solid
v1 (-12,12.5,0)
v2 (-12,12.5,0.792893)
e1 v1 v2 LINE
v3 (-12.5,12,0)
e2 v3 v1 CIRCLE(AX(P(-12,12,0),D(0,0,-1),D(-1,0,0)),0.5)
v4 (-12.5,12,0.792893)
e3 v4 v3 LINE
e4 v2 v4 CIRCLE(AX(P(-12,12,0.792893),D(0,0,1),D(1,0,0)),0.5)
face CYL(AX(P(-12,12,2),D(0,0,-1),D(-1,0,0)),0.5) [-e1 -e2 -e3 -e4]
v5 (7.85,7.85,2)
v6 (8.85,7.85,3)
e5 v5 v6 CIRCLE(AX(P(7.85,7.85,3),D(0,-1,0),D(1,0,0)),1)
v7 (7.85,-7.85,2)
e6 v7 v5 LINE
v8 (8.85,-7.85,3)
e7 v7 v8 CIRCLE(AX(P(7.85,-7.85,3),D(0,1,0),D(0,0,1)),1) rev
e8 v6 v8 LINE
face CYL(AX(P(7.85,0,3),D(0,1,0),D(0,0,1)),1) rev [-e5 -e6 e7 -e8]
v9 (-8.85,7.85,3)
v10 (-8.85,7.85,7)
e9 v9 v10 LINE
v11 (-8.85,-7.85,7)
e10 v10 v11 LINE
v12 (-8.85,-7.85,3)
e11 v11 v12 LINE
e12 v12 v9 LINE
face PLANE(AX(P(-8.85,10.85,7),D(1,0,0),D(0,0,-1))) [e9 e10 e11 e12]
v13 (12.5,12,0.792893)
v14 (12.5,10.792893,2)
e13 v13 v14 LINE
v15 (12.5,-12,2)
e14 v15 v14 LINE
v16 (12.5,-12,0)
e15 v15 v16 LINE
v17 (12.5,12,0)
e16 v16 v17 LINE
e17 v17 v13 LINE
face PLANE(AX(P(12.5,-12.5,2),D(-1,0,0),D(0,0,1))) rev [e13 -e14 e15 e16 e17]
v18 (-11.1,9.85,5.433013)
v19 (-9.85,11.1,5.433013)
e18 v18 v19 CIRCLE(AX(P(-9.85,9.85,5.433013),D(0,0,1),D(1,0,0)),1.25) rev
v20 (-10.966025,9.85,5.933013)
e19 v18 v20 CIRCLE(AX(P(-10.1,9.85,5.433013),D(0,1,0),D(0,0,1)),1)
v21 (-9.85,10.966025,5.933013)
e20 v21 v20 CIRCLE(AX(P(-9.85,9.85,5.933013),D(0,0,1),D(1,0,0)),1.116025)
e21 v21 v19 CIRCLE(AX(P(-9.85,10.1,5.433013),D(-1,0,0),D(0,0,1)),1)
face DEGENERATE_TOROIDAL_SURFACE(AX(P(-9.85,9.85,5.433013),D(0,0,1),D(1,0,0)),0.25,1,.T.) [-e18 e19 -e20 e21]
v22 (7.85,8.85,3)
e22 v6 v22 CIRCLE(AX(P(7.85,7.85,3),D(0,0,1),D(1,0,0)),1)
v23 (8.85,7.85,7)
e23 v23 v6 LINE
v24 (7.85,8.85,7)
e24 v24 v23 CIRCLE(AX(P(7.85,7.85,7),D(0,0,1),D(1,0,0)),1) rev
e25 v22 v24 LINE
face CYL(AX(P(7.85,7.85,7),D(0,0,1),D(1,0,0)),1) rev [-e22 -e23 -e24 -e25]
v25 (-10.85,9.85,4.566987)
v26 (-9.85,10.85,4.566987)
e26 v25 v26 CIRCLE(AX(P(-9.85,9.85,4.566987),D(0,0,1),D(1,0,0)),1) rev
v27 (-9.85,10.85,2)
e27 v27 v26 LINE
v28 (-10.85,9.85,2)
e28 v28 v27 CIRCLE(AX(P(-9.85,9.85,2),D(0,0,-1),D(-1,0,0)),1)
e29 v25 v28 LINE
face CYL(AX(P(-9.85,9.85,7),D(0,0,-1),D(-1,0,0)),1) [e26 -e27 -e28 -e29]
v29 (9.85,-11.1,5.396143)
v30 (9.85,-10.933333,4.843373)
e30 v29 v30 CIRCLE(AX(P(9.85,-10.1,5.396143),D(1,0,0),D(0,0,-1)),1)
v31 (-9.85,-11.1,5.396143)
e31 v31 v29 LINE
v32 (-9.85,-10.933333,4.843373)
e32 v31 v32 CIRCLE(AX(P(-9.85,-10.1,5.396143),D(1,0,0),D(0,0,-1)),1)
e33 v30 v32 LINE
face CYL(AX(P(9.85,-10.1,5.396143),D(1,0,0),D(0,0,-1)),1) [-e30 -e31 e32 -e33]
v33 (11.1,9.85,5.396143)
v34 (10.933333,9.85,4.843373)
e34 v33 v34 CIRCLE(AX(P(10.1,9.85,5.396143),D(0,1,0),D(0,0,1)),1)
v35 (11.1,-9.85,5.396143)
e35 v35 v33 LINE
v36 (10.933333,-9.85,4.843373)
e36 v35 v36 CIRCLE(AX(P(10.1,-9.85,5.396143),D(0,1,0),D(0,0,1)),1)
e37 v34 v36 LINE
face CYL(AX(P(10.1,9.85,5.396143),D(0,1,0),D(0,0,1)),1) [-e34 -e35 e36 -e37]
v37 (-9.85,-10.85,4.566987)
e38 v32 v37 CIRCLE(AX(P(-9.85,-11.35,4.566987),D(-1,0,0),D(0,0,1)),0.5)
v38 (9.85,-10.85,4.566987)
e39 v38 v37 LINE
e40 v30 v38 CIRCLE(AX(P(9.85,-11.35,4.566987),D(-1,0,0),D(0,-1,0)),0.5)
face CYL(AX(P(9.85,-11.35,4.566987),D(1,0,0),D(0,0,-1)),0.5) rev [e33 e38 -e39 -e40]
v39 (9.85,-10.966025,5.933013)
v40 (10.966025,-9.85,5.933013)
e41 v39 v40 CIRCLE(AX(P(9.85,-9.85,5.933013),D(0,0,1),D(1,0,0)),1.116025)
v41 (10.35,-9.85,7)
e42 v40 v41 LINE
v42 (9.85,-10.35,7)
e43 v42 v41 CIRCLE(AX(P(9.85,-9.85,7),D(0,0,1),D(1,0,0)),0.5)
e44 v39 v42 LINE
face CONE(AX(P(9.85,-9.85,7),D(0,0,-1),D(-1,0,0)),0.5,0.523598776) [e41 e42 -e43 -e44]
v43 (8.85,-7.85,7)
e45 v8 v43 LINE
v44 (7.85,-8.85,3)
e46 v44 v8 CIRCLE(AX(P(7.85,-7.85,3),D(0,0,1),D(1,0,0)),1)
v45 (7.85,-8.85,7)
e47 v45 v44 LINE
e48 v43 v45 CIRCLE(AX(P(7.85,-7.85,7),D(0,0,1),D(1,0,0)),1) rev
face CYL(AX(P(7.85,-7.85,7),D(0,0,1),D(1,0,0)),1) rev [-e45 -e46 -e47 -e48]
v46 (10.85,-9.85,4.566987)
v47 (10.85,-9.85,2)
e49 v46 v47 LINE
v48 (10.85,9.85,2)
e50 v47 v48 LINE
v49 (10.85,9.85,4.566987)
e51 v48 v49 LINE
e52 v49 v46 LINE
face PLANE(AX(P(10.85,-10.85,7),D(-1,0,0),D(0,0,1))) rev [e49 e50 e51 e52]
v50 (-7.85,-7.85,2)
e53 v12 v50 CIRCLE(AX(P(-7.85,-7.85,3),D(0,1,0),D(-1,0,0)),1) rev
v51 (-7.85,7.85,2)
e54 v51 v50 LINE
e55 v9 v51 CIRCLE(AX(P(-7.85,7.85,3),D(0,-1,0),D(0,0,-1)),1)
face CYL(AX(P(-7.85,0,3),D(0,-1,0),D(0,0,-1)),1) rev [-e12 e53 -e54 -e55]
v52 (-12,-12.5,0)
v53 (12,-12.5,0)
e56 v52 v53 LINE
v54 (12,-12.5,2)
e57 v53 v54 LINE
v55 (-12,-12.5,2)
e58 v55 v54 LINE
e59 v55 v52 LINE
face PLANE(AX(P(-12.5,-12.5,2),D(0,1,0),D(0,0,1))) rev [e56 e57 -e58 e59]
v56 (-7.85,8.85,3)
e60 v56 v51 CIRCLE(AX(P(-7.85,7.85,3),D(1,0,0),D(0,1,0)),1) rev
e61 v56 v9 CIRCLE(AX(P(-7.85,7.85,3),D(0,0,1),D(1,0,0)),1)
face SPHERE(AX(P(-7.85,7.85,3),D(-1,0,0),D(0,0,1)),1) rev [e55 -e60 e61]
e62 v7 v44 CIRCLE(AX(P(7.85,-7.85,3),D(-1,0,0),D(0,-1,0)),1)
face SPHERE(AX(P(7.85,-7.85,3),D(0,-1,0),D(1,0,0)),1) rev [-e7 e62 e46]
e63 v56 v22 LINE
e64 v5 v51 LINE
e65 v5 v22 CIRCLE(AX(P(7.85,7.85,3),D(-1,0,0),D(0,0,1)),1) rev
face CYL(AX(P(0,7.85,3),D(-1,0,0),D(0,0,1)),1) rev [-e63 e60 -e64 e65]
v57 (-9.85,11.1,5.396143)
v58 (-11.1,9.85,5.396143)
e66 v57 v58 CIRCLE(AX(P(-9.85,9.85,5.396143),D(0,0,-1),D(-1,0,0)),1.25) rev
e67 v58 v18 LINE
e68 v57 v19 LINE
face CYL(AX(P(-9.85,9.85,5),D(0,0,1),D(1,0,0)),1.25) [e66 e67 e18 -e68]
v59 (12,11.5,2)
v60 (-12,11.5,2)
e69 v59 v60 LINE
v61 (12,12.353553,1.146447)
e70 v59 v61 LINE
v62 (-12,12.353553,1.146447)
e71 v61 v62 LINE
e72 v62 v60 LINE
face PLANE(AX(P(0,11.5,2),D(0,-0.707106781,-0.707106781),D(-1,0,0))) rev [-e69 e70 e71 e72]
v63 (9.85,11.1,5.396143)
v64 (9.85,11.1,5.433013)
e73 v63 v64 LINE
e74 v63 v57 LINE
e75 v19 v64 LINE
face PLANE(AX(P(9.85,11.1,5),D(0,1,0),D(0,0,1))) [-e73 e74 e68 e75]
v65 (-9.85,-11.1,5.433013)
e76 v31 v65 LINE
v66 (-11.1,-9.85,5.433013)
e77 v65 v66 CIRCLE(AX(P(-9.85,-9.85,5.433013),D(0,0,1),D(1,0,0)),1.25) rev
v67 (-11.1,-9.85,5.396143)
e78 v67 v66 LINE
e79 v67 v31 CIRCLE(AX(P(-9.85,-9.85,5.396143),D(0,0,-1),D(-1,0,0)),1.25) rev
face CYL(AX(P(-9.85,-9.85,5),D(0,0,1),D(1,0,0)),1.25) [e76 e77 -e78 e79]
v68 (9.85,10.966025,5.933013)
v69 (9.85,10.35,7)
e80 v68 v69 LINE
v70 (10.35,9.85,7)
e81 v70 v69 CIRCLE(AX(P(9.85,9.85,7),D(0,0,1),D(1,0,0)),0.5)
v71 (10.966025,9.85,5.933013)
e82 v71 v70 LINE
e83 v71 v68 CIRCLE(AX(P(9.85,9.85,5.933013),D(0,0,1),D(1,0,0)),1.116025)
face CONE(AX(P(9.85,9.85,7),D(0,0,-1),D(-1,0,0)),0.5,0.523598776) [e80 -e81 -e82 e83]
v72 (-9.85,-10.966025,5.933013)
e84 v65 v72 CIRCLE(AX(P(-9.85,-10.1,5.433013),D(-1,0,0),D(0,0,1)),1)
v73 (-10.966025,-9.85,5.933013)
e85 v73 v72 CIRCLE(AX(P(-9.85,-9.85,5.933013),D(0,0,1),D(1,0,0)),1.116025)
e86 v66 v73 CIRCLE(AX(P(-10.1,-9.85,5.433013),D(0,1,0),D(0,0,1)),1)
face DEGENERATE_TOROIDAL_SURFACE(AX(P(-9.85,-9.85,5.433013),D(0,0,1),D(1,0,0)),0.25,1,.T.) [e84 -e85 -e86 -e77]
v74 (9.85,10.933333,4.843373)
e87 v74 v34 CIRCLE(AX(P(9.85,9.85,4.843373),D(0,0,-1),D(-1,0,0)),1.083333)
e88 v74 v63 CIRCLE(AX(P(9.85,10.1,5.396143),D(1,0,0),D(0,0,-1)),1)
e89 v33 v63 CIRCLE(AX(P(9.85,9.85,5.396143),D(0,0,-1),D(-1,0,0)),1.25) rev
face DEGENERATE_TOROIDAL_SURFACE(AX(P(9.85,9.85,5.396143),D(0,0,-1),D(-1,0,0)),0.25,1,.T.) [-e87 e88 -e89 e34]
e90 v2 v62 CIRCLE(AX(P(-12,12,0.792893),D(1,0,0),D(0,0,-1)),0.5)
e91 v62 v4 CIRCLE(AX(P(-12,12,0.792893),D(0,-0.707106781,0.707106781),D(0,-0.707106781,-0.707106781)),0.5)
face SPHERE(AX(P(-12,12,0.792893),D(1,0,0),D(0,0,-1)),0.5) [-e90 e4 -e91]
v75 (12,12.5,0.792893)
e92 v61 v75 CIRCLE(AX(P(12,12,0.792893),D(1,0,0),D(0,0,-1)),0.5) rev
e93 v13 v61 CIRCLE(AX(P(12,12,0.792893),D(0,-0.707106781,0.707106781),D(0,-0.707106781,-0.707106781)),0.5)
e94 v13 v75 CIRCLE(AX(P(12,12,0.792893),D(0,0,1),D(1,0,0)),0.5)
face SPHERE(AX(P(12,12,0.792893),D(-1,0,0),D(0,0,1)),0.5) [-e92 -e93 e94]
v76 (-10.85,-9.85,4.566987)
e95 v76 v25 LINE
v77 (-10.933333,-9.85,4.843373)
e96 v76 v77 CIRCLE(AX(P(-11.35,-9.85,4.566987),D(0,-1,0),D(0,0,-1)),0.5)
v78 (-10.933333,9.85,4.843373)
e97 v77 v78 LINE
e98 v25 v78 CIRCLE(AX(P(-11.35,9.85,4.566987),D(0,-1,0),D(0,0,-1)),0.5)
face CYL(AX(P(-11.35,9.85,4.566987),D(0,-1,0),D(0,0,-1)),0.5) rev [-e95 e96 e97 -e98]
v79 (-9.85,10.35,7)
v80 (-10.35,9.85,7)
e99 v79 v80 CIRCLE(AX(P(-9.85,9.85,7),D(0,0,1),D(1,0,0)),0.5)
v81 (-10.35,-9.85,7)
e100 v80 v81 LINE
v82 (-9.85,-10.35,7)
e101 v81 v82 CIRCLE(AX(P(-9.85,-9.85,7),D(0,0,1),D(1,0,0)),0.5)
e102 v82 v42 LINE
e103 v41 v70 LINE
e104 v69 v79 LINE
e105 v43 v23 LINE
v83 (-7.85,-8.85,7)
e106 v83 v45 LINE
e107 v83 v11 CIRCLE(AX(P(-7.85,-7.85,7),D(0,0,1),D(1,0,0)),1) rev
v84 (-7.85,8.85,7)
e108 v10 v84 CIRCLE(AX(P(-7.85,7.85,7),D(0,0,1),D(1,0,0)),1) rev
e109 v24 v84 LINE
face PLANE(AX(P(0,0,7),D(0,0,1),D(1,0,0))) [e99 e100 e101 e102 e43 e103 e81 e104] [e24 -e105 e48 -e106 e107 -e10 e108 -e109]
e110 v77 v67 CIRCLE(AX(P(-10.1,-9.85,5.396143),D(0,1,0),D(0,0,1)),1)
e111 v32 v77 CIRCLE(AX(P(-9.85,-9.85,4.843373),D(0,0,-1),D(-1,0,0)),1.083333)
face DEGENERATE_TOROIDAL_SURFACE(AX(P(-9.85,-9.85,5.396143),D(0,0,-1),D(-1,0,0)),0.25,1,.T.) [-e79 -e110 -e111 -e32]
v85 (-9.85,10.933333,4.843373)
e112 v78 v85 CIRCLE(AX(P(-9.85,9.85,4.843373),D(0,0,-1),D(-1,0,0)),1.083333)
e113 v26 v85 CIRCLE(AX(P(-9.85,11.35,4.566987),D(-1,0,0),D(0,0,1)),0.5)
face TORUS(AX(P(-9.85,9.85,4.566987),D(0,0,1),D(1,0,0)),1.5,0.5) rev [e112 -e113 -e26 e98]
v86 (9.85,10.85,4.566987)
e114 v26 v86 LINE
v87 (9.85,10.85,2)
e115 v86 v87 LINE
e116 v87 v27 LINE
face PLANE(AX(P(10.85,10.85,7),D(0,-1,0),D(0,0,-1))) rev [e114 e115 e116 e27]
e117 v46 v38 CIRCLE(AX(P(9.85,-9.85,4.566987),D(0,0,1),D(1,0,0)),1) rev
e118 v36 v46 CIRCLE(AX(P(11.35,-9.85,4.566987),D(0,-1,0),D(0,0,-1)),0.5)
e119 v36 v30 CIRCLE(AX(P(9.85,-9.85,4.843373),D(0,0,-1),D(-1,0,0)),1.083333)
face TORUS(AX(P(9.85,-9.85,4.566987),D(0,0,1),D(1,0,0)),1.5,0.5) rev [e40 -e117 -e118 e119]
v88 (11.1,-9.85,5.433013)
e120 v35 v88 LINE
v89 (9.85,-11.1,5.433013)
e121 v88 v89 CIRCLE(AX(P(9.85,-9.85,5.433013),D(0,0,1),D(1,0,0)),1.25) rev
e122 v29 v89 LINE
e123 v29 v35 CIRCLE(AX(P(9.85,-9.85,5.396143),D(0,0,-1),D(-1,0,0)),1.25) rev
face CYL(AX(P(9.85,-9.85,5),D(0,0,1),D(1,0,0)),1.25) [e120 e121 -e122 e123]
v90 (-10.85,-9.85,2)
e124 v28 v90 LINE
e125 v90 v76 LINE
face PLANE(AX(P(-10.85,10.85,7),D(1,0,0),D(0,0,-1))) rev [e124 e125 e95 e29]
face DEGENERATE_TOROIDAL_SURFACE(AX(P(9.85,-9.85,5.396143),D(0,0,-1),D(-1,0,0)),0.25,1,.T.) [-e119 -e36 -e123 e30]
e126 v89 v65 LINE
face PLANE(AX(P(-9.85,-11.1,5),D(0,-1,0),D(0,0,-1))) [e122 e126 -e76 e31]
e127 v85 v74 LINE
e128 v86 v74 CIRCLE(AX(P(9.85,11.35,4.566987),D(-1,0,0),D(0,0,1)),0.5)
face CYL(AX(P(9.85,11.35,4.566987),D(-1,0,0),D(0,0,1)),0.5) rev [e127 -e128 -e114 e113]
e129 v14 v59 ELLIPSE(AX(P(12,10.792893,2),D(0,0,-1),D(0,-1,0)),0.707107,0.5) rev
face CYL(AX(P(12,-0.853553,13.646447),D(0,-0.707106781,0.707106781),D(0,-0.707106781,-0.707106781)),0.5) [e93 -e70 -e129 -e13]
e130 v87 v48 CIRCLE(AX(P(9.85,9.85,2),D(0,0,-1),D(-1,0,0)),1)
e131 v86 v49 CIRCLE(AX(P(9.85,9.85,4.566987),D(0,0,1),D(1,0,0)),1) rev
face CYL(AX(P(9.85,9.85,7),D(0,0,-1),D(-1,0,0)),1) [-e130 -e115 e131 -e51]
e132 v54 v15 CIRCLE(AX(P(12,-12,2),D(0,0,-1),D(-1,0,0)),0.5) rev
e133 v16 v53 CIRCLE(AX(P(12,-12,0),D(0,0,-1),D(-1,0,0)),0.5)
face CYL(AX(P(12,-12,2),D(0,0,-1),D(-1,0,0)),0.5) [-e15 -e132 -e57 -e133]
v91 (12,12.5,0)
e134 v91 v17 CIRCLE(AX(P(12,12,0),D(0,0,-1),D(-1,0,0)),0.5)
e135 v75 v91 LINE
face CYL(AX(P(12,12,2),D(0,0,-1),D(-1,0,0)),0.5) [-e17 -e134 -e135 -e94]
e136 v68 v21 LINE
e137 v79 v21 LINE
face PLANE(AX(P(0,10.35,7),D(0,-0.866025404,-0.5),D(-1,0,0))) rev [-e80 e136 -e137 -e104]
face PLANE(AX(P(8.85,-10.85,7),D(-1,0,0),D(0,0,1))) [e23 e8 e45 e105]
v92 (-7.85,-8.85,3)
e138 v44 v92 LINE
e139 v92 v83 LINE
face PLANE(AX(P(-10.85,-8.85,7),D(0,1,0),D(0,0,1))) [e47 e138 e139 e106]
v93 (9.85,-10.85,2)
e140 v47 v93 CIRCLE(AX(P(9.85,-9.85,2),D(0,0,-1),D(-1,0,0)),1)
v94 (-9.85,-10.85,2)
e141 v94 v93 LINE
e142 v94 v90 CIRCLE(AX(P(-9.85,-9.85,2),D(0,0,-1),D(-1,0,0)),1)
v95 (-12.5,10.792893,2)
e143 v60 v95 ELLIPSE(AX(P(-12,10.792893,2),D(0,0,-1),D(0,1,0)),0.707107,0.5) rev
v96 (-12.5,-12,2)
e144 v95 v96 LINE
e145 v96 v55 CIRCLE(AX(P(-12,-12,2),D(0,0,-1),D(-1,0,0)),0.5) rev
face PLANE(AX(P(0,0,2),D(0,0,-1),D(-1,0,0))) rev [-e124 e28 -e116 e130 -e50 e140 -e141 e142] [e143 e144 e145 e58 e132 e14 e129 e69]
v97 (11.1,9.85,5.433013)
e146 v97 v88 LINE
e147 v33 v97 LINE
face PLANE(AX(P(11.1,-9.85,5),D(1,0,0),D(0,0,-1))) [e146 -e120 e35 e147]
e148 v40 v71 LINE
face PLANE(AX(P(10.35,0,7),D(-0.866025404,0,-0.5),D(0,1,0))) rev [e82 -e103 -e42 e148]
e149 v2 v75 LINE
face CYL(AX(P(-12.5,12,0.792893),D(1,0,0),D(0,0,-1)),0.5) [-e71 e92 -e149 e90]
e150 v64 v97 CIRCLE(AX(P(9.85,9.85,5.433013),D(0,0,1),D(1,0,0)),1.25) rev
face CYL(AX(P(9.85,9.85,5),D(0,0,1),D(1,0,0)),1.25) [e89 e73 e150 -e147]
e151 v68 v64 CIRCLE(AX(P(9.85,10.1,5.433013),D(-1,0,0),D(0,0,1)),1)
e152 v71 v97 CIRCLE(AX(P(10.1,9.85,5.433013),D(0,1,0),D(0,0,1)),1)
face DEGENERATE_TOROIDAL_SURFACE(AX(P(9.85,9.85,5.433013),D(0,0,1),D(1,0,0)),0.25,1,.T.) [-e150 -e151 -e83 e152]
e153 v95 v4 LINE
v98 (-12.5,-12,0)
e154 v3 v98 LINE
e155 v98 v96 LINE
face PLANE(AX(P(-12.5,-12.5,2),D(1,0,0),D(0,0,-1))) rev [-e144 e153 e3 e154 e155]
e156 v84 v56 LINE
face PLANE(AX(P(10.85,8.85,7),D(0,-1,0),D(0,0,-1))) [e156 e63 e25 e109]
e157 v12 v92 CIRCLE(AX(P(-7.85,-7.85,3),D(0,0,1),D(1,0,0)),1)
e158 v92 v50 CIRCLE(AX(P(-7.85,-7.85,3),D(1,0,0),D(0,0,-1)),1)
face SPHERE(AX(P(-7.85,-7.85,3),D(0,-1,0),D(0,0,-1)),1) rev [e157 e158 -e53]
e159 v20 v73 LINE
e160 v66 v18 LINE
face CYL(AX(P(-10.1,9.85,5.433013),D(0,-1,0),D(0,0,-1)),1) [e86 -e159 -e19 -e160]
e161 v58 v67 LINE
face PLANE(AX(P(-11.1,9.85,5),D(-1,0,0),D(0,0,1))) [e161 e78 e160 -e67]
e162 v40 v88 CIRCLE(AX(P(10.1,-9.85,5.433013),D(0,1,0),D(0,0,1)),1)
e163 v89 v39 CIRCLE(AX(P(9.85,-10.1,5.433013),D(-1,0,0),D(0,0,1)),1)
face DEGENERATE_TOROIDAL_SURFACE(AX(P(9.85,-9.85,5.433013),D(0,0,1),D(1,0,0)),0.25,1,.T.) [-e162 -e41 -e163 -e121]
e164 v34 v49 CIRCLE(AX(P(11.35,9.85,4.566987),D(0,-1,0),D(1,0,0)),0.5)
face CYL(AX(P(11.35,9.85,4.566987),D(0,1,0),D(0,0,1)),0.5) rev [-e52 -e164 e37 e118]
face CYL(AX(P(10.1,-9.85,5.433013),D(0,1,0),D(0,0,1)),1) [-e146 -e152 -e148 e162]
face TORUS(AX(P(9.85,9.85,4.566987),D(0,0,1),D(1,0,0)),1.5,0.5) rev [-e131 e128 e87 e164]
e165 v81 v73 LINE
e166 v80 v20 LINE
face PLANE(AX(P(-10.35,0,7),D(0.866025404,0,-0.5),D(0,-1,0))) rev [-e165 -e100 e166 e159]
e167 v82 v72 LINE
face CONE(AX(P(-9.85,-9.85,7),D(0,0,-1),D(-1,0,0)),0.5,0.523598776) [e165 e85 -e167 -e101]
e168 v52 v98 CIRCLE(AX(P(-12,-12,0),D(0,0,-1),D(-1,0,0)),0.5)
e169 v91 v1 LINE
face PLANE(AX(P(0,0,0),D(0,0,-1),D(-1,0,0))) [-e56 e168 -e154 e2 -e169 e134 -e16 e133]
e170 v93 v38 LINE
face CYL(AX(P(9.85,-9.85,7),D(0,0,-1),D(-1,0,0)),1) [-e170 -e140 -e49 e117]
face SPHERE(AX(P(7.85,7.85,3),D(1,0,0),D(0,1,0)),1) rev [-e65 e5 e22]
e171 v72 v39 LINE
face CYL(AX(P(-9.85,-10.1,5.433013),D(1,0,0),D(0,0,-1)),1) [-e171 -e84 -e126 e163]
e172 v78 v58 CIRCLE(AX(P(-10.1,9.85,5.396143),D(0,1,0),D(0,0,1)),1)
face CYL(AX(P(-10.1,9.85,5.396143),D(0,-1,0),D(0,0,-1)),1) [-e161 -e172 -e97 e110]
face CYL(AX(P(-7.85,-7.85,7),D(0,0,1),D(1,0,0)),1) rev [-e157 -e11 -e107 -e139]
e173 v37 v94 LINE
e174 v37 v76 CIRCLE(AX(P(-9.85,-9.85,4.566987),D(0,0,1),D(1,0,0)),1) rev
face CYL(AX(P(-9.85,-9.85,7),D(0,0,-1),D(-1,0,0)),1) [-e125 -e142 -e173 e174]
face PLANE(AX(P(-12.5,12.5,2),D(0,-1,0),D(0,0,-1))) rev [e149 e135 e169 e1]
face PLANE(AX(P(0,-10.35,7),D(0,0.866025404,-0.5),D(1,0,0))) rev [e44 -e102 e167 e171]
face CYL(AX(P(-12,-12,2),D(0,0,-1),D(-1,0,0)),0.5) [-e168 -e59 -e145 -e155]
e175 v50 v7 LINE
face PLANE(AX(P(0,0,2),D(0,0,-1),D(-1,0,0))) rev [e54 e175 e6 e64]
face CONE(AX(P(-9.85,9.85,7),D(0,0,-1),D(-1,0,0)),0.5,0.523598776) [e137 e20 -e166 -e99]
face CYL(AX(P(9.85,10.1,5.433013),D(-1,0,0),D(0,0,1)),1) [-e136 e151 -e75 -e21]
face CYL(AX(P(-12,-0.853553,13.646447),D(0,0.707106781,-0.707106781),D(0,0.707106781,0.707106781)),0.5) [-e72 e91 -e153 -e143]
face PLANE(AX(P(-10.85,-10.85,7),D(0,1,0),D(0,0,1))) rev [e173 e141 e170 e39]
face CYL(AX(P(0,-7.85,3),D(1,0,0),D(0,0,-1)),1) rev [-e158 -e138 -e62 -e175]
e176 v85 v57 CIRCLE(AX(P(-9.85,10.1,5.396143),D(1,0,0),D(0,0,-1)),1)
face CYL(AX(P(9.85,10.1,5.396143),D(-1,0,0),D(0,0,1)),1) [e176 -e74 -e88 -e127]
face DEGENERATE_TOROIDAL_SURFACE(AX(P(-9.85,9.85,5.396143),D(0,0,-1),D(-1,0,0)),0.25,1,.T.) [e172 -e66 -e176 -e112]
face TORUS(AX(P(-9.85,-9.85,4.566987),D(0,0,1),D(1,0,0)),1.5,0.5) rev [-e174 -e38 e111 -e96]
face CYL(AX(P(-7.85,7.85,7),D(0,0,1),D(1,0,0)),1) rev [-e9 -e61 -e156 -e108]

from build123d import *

# Parameters (mm, degrees)
SKIZZE1_W                       = 25
SKIZZE1_H                       = 25
AUFSATZ_LINEAR_AUSTRAGEN1_DEPTH = 2
SKIZZE2_W                       = 21.7
SKIZZE2_H                       = 21.7
SKIZZE2_W_2                     = 17.7
SKIZZE2_H_2                     = 17.7
LINEAR_AUSTRAGEN_D_NN1_DEPTH    = 5
VERRUNDUNG1_R                   = 1
LINEAR_AUSTRAGEN_D_NN2_DEPTH    = 2
FASE1_SIZE                      = 0.75
FASE1_SIZE2                     = 1.299038106
VERRUNDUNG2_R                   = 0.5
VERRUNDUNG3_R                   = 1
FASE2_SIZE                      = 1
VERRUNDUNG5_R                   = 0.5
VERRUNDUNG4_R                   = 0.5
VERRUNDUNG6_R                   = 1


with BuildPart() as part:
    # Skizze1 → Aufsatz-Linear austragen1 (new body)
    with BuildSketch(Plane.XY):
        Rectangle(SKIZZE1_W, SKIZZE1_H)
    extrude(amount=AUFSATZ_LINEAR_AUSTRAGEN1_DEPTH)

    # Skizze2 → Linear-Austragen-Dünn1 (add)
    with BuildSketch(Plane.XY.offset(2)):
        Rectangle(SKIZZE2_W, SKIZZE2_H)
        Rectangle(SKIZZE2_W_2, SKIZZE2_H_2, mode=Mode.SUBTRACT)
    extrude(amount=LINEAR_AUSTRAGEN_D_NN1_DEPTH)

    # Verrundung1
    verrundung1_edges = [part.edges().sort_by_distance(p)[0] for p in [
        (-10.85, -10.85, 4.5),
        (10.85, -10.85, 4.5),
        (10.85, 10.85, 4.5),
        (-10.85, 10.85, 4.5),
    ]]
    fillet(verrundung1_edges, radius=VERRUNDUNG1_R)

    # Skizze3 → Linear-Austragen-Dünn2 (add)
    with BuildSketch(Plane.XY.offset(7)):
        with BuildLine():
            Line((9.85, 11.1), (-9.85, 11.1))
            ThreePointArc((-9.85, 11.1), (-10.733883476, 10.733883476), (-11.1, 9.85))
            Line((-11.1, 9.85), (-11.1, -9.85))
            ThreePointArc((-11.1, -9.85), (-10.733883476, -10.733883476), (-9.85, -11.1))
            Line((-9.85, -11.1), (9.85, -11.1))
            ThreePointArc((9.85, -11.1), (10.733883476, -10.733883476), (11.1, -9.85))
            Line((11.1, -9.85), (11.1, 9.85))
            ThreePointArc((11.1, 9.85), (10.733883476, 10.733883476), (9.85, 11.1))
        make_face()
        with BuildLine():
            Line((9.85, 10.85), (-9.85, 10.85))
            ThreePointArc((-9.85, 10.85), (-10.557106781, 10.557106781), (-10.85, 9.85))
            Line((-10.85, 9.85), (-10.85, -9.85))
            ThreePointArc((-10.85, -9.85), (-10.557106781, -10.557106781), (-9.85, -10.85))
            Line((-9.85, -10.85), (9.85, -10.85))
            ThreePointArc((9.85, -10.85), (10.557106781, -10.557106781), (10.85, -9.85))
            Line((10.85, -9.85), (10.85, 9.85))
            ThreePointArc((10.85, 9.85), (10.557106781, 10.557106781), (9.85, 10.85))
        make_face(mode=Mode.SUBTRACT)
    extrude(amount=-LINEAR_AUSTRAGEN_D_NN2_DEPTH)

    # Fase1
    fase1_edges = [part.edges().sort_by_distance(p)[0] for p in [
        (10.733883476, 10.733883476, 7),
        (0, 11.1, 7),
        (-10.733883476, 10.733883476, 7),
        (-11.1, 0, 7),
        (-10.733883476, -10.733883476, 7),
        (0, -11.1, 7),
        (10.733883476, -10.733883476, 7),
        (11.1, 0, 7),
    ]]
    fase1_side = [part.faces().sort_by_distance(p)[0] for p in [
        (10.511883476, 10.511883476, 7),
    ]]
    chamfer(fase1_edges, length=FASE1_SIZE, length2=FASE1_SIZE2, reference=fase1_side[0])

    # Verrundung2
    # the kernel refuses this fillet: 0.5 mm, written as the material it adds along each edge
    with BuildSketch(Plane(origin=(10.85, -9.85, 5), x_dir=(1, 0, 0), z_dir=(0, 1, 0)), Plane(origin=(9.85, 10.85, 5), x_dir=(0, 1, 0), z_dir=(-1, 0, 0)), Plane(origin=(-10.85, 9.85, 5), x_dir=(-1, 0, 0), z_dir=(0, -1, 0)), Plane(origin=(-9.85, -10.85, 5), x_dir=(0, -1, 0), z_dir=(1, 0, 0))) as verrundung2_piece_1:
        with BuildLine():
            CenterArc((0.5, 0.433012702), VERRUNDUNG2_R, 180, 60)
            Line((0, 0.433012702), (-0.01, 0.433012702))
            Line((-0.01, 0.433012702), (-0.01, 0))
            Line((-0.01, 0), (0, -0.01))
            ThreePointArc((0, -0.01), (0.125, -0.01), (0.245, -0.008660254))
            Line((0.245, -0.008660254), (0.25, 0))
        make_face()
    extrude(amount=19.7)
    with BuildSketch(Plane(origin=(9.85, 9.85, 5), x_dir=(1, 0, 0), z_dir=(0, -1, 0))) as verrundung2_piece_2:
        with BuildLine():
            CenterArc((1.5, -0.433012702), VERRUNDUNG2_R, 120, 60)
            Line((1, -0.433012702), (0.99, -0.433012702))
            Line((0.99, -0.433012702), (0.99, 0))
            Line((0.99, 0), (1, 0.01))
            ThreePointArc((1, 0.01), (1.125, 0.01), (1.245, 0.008660254))
            Line((1.245, 0.008660254), (1.25, 0))
        make_face()
    revolve(axis=Axis((9.85, 9.85, 5), (0, 0, 1)), revolution_arc=90)
    with BuildSketch(Plane(origin=(-9.85, 9.85, 5), x_dir=(0, 1, 0), z_dir=(1, 0, 0))) as verrundung2_piece_3:
        with BuildLine():
            CenterArc((1.5, -0.433012702), VERRUNDUNG2_R, 120, 60)
            Line((1, -0.433012702), (0.99, -0.433012702))
            Line((0.99, -0.433012702), (0.99, 0))
            Line((0.99, 0), (1, 0.01))
            ThreePointArc((1, 0.01), (1.125, 0.01), (1.245, 0.008660254))
            Line((1.245, 0.008660254), (1.25, 0))
        make_face()
    revolve(axis=Axis((-9.85, 9.85, 5), (0, 0, 1)), revolution_arc=90)
    with BuildSketch(Plane(origin=(-9.85, -9.85, 5), x_dir=(-1, 0, 0), z_dir=(0, 1, 0))) as verrundung2_piece_4:
        with BuildLine():
            CenterArc((1.5, -0.433012702), VERRUNDUNG2_R, 120, 60)
            Line((1, -0.433012702), (0.99, -0.433012702))
            Line((0.99, -0.433012702), (0.99, 0))
            Line((0.99, 0), (1, 0.01))
            ThreePointArc((1, 0.01), (1.125, 0.01), (1.245, 0.008660254))
            Line((1.245, 0.008660254), (1.25, 0))
        make_face()
    revolve(axis=Axis((-9.85, -9.85, 5), (0, 0, 1)), revolution_arc=90)
    with BuildSketch(Plane(origin=(9.85, -9.85, 5), x_dir=(0, -1, 0), z_dir=(-1, 0, 0))) as verrundung2_piece_5:
        with BuildLine():
            CenterArc((1.5, -0.433012702), VERRUNDUNG2_R, 120, 60)
            Line((1, -0.433012702), (0.99, -0.433012702))
            Line((0.99, -0.433012702), (0.99, 0))
            Line((0.99, 0), (1, 0.01))
            ThreePointArc((1, 0.01), (1.125, 0.01), (1.245, 0.008660254))
            Line((1.245, 0.008660254), (1.25, 0))
        make_face()
    revolve(axis=Axis((9.85, -9.85, 5), (0, 0, 1)), revolution_arc=90)

    # Verrundung3
    verrundung3_edges = [part.edges().sort_by_distance(p)[0] for p in [
        (0, -11.1, 5.700961894),
        (10.733883476, -10.733883476, 5.700961894),
        (-10.733883476, -10.733883476, 5.700961894),
        (11.1, 0, 5.700961894),
        (-11.1, 0, 5.700961894),
        (10.733883476, 10.733883476, 5.700961894),
        (-10.733883476, 10.733883476, 5.700961894),
        (0, 11.1, 5.700961894),
        (10.733883476, 10.733883476, 5),
        (11.1, 0, 5),
        (10.733883476, -10.733883476, 5),
        (0, -11.1, 5),
        (-10.733883476, -10.733883476, 5),
        (-11.1, 0, 5),
        (-10.733883476, 10.733883476, 5),
        (0, 11.1, 5),
    ]]
    fillet(verrundung3_edges, radius=VERRUNDUNG3_R)

    # Fase2
    fase2_edges = [part.edges().sort_by_distance(p)[0] for p in [
        (0, 12.5, 2),
    ]]
    chamfer(fase2_edges, length=FASE2_SIZE)

    # Verrundung5
    verrundung5_edges = [part.edges().sort_by_distance(p)[0] for p in [
        (0, 12.5, 1),
    ]]
    fillet(verrundung5_edges, radius=VERRUNDUNG5_R)

    # Verrundung4
    verrundung4_edges = [part.edges().sort_by_distance(p)[0] for p in [
        (-12.5, 11.926776695, 1.573223305),
        (-12.5, 12.5, 0.396446609),
        (12.5, 12.5, 0.396446609),
        (12.5, 11.926776695, 1.573223305),
        (12.5, 12.461939766, 0.984234935),
        (-12.5, 12.461939766, 0.984234935),
        (12.5, -12.5, 1),
        (-12.5, -12.5, 1),
    ]]
    fillet(verrundung4_edges, radius=VERRUNDUNG4_R)

    # Verrundung6
    verrundung6_edges = [part.edges().sort_by_distance(p)[0] for p in [
        (0, -8.85, 2),
        (8.85, 0, 2),
        (0, 8.85, 2),
        (-8.85, 0, 2),
        (8.85, -8.85, 4.5),
        (8.85, 8.85, 4.5),
        (-8.85, 8.85, 4.5),
        (-8.85, -8.85, 4.5),
    ]]
    fillet(verrundung6_edges, radius=VERRUNDUNG6_R)


solid = part.part
